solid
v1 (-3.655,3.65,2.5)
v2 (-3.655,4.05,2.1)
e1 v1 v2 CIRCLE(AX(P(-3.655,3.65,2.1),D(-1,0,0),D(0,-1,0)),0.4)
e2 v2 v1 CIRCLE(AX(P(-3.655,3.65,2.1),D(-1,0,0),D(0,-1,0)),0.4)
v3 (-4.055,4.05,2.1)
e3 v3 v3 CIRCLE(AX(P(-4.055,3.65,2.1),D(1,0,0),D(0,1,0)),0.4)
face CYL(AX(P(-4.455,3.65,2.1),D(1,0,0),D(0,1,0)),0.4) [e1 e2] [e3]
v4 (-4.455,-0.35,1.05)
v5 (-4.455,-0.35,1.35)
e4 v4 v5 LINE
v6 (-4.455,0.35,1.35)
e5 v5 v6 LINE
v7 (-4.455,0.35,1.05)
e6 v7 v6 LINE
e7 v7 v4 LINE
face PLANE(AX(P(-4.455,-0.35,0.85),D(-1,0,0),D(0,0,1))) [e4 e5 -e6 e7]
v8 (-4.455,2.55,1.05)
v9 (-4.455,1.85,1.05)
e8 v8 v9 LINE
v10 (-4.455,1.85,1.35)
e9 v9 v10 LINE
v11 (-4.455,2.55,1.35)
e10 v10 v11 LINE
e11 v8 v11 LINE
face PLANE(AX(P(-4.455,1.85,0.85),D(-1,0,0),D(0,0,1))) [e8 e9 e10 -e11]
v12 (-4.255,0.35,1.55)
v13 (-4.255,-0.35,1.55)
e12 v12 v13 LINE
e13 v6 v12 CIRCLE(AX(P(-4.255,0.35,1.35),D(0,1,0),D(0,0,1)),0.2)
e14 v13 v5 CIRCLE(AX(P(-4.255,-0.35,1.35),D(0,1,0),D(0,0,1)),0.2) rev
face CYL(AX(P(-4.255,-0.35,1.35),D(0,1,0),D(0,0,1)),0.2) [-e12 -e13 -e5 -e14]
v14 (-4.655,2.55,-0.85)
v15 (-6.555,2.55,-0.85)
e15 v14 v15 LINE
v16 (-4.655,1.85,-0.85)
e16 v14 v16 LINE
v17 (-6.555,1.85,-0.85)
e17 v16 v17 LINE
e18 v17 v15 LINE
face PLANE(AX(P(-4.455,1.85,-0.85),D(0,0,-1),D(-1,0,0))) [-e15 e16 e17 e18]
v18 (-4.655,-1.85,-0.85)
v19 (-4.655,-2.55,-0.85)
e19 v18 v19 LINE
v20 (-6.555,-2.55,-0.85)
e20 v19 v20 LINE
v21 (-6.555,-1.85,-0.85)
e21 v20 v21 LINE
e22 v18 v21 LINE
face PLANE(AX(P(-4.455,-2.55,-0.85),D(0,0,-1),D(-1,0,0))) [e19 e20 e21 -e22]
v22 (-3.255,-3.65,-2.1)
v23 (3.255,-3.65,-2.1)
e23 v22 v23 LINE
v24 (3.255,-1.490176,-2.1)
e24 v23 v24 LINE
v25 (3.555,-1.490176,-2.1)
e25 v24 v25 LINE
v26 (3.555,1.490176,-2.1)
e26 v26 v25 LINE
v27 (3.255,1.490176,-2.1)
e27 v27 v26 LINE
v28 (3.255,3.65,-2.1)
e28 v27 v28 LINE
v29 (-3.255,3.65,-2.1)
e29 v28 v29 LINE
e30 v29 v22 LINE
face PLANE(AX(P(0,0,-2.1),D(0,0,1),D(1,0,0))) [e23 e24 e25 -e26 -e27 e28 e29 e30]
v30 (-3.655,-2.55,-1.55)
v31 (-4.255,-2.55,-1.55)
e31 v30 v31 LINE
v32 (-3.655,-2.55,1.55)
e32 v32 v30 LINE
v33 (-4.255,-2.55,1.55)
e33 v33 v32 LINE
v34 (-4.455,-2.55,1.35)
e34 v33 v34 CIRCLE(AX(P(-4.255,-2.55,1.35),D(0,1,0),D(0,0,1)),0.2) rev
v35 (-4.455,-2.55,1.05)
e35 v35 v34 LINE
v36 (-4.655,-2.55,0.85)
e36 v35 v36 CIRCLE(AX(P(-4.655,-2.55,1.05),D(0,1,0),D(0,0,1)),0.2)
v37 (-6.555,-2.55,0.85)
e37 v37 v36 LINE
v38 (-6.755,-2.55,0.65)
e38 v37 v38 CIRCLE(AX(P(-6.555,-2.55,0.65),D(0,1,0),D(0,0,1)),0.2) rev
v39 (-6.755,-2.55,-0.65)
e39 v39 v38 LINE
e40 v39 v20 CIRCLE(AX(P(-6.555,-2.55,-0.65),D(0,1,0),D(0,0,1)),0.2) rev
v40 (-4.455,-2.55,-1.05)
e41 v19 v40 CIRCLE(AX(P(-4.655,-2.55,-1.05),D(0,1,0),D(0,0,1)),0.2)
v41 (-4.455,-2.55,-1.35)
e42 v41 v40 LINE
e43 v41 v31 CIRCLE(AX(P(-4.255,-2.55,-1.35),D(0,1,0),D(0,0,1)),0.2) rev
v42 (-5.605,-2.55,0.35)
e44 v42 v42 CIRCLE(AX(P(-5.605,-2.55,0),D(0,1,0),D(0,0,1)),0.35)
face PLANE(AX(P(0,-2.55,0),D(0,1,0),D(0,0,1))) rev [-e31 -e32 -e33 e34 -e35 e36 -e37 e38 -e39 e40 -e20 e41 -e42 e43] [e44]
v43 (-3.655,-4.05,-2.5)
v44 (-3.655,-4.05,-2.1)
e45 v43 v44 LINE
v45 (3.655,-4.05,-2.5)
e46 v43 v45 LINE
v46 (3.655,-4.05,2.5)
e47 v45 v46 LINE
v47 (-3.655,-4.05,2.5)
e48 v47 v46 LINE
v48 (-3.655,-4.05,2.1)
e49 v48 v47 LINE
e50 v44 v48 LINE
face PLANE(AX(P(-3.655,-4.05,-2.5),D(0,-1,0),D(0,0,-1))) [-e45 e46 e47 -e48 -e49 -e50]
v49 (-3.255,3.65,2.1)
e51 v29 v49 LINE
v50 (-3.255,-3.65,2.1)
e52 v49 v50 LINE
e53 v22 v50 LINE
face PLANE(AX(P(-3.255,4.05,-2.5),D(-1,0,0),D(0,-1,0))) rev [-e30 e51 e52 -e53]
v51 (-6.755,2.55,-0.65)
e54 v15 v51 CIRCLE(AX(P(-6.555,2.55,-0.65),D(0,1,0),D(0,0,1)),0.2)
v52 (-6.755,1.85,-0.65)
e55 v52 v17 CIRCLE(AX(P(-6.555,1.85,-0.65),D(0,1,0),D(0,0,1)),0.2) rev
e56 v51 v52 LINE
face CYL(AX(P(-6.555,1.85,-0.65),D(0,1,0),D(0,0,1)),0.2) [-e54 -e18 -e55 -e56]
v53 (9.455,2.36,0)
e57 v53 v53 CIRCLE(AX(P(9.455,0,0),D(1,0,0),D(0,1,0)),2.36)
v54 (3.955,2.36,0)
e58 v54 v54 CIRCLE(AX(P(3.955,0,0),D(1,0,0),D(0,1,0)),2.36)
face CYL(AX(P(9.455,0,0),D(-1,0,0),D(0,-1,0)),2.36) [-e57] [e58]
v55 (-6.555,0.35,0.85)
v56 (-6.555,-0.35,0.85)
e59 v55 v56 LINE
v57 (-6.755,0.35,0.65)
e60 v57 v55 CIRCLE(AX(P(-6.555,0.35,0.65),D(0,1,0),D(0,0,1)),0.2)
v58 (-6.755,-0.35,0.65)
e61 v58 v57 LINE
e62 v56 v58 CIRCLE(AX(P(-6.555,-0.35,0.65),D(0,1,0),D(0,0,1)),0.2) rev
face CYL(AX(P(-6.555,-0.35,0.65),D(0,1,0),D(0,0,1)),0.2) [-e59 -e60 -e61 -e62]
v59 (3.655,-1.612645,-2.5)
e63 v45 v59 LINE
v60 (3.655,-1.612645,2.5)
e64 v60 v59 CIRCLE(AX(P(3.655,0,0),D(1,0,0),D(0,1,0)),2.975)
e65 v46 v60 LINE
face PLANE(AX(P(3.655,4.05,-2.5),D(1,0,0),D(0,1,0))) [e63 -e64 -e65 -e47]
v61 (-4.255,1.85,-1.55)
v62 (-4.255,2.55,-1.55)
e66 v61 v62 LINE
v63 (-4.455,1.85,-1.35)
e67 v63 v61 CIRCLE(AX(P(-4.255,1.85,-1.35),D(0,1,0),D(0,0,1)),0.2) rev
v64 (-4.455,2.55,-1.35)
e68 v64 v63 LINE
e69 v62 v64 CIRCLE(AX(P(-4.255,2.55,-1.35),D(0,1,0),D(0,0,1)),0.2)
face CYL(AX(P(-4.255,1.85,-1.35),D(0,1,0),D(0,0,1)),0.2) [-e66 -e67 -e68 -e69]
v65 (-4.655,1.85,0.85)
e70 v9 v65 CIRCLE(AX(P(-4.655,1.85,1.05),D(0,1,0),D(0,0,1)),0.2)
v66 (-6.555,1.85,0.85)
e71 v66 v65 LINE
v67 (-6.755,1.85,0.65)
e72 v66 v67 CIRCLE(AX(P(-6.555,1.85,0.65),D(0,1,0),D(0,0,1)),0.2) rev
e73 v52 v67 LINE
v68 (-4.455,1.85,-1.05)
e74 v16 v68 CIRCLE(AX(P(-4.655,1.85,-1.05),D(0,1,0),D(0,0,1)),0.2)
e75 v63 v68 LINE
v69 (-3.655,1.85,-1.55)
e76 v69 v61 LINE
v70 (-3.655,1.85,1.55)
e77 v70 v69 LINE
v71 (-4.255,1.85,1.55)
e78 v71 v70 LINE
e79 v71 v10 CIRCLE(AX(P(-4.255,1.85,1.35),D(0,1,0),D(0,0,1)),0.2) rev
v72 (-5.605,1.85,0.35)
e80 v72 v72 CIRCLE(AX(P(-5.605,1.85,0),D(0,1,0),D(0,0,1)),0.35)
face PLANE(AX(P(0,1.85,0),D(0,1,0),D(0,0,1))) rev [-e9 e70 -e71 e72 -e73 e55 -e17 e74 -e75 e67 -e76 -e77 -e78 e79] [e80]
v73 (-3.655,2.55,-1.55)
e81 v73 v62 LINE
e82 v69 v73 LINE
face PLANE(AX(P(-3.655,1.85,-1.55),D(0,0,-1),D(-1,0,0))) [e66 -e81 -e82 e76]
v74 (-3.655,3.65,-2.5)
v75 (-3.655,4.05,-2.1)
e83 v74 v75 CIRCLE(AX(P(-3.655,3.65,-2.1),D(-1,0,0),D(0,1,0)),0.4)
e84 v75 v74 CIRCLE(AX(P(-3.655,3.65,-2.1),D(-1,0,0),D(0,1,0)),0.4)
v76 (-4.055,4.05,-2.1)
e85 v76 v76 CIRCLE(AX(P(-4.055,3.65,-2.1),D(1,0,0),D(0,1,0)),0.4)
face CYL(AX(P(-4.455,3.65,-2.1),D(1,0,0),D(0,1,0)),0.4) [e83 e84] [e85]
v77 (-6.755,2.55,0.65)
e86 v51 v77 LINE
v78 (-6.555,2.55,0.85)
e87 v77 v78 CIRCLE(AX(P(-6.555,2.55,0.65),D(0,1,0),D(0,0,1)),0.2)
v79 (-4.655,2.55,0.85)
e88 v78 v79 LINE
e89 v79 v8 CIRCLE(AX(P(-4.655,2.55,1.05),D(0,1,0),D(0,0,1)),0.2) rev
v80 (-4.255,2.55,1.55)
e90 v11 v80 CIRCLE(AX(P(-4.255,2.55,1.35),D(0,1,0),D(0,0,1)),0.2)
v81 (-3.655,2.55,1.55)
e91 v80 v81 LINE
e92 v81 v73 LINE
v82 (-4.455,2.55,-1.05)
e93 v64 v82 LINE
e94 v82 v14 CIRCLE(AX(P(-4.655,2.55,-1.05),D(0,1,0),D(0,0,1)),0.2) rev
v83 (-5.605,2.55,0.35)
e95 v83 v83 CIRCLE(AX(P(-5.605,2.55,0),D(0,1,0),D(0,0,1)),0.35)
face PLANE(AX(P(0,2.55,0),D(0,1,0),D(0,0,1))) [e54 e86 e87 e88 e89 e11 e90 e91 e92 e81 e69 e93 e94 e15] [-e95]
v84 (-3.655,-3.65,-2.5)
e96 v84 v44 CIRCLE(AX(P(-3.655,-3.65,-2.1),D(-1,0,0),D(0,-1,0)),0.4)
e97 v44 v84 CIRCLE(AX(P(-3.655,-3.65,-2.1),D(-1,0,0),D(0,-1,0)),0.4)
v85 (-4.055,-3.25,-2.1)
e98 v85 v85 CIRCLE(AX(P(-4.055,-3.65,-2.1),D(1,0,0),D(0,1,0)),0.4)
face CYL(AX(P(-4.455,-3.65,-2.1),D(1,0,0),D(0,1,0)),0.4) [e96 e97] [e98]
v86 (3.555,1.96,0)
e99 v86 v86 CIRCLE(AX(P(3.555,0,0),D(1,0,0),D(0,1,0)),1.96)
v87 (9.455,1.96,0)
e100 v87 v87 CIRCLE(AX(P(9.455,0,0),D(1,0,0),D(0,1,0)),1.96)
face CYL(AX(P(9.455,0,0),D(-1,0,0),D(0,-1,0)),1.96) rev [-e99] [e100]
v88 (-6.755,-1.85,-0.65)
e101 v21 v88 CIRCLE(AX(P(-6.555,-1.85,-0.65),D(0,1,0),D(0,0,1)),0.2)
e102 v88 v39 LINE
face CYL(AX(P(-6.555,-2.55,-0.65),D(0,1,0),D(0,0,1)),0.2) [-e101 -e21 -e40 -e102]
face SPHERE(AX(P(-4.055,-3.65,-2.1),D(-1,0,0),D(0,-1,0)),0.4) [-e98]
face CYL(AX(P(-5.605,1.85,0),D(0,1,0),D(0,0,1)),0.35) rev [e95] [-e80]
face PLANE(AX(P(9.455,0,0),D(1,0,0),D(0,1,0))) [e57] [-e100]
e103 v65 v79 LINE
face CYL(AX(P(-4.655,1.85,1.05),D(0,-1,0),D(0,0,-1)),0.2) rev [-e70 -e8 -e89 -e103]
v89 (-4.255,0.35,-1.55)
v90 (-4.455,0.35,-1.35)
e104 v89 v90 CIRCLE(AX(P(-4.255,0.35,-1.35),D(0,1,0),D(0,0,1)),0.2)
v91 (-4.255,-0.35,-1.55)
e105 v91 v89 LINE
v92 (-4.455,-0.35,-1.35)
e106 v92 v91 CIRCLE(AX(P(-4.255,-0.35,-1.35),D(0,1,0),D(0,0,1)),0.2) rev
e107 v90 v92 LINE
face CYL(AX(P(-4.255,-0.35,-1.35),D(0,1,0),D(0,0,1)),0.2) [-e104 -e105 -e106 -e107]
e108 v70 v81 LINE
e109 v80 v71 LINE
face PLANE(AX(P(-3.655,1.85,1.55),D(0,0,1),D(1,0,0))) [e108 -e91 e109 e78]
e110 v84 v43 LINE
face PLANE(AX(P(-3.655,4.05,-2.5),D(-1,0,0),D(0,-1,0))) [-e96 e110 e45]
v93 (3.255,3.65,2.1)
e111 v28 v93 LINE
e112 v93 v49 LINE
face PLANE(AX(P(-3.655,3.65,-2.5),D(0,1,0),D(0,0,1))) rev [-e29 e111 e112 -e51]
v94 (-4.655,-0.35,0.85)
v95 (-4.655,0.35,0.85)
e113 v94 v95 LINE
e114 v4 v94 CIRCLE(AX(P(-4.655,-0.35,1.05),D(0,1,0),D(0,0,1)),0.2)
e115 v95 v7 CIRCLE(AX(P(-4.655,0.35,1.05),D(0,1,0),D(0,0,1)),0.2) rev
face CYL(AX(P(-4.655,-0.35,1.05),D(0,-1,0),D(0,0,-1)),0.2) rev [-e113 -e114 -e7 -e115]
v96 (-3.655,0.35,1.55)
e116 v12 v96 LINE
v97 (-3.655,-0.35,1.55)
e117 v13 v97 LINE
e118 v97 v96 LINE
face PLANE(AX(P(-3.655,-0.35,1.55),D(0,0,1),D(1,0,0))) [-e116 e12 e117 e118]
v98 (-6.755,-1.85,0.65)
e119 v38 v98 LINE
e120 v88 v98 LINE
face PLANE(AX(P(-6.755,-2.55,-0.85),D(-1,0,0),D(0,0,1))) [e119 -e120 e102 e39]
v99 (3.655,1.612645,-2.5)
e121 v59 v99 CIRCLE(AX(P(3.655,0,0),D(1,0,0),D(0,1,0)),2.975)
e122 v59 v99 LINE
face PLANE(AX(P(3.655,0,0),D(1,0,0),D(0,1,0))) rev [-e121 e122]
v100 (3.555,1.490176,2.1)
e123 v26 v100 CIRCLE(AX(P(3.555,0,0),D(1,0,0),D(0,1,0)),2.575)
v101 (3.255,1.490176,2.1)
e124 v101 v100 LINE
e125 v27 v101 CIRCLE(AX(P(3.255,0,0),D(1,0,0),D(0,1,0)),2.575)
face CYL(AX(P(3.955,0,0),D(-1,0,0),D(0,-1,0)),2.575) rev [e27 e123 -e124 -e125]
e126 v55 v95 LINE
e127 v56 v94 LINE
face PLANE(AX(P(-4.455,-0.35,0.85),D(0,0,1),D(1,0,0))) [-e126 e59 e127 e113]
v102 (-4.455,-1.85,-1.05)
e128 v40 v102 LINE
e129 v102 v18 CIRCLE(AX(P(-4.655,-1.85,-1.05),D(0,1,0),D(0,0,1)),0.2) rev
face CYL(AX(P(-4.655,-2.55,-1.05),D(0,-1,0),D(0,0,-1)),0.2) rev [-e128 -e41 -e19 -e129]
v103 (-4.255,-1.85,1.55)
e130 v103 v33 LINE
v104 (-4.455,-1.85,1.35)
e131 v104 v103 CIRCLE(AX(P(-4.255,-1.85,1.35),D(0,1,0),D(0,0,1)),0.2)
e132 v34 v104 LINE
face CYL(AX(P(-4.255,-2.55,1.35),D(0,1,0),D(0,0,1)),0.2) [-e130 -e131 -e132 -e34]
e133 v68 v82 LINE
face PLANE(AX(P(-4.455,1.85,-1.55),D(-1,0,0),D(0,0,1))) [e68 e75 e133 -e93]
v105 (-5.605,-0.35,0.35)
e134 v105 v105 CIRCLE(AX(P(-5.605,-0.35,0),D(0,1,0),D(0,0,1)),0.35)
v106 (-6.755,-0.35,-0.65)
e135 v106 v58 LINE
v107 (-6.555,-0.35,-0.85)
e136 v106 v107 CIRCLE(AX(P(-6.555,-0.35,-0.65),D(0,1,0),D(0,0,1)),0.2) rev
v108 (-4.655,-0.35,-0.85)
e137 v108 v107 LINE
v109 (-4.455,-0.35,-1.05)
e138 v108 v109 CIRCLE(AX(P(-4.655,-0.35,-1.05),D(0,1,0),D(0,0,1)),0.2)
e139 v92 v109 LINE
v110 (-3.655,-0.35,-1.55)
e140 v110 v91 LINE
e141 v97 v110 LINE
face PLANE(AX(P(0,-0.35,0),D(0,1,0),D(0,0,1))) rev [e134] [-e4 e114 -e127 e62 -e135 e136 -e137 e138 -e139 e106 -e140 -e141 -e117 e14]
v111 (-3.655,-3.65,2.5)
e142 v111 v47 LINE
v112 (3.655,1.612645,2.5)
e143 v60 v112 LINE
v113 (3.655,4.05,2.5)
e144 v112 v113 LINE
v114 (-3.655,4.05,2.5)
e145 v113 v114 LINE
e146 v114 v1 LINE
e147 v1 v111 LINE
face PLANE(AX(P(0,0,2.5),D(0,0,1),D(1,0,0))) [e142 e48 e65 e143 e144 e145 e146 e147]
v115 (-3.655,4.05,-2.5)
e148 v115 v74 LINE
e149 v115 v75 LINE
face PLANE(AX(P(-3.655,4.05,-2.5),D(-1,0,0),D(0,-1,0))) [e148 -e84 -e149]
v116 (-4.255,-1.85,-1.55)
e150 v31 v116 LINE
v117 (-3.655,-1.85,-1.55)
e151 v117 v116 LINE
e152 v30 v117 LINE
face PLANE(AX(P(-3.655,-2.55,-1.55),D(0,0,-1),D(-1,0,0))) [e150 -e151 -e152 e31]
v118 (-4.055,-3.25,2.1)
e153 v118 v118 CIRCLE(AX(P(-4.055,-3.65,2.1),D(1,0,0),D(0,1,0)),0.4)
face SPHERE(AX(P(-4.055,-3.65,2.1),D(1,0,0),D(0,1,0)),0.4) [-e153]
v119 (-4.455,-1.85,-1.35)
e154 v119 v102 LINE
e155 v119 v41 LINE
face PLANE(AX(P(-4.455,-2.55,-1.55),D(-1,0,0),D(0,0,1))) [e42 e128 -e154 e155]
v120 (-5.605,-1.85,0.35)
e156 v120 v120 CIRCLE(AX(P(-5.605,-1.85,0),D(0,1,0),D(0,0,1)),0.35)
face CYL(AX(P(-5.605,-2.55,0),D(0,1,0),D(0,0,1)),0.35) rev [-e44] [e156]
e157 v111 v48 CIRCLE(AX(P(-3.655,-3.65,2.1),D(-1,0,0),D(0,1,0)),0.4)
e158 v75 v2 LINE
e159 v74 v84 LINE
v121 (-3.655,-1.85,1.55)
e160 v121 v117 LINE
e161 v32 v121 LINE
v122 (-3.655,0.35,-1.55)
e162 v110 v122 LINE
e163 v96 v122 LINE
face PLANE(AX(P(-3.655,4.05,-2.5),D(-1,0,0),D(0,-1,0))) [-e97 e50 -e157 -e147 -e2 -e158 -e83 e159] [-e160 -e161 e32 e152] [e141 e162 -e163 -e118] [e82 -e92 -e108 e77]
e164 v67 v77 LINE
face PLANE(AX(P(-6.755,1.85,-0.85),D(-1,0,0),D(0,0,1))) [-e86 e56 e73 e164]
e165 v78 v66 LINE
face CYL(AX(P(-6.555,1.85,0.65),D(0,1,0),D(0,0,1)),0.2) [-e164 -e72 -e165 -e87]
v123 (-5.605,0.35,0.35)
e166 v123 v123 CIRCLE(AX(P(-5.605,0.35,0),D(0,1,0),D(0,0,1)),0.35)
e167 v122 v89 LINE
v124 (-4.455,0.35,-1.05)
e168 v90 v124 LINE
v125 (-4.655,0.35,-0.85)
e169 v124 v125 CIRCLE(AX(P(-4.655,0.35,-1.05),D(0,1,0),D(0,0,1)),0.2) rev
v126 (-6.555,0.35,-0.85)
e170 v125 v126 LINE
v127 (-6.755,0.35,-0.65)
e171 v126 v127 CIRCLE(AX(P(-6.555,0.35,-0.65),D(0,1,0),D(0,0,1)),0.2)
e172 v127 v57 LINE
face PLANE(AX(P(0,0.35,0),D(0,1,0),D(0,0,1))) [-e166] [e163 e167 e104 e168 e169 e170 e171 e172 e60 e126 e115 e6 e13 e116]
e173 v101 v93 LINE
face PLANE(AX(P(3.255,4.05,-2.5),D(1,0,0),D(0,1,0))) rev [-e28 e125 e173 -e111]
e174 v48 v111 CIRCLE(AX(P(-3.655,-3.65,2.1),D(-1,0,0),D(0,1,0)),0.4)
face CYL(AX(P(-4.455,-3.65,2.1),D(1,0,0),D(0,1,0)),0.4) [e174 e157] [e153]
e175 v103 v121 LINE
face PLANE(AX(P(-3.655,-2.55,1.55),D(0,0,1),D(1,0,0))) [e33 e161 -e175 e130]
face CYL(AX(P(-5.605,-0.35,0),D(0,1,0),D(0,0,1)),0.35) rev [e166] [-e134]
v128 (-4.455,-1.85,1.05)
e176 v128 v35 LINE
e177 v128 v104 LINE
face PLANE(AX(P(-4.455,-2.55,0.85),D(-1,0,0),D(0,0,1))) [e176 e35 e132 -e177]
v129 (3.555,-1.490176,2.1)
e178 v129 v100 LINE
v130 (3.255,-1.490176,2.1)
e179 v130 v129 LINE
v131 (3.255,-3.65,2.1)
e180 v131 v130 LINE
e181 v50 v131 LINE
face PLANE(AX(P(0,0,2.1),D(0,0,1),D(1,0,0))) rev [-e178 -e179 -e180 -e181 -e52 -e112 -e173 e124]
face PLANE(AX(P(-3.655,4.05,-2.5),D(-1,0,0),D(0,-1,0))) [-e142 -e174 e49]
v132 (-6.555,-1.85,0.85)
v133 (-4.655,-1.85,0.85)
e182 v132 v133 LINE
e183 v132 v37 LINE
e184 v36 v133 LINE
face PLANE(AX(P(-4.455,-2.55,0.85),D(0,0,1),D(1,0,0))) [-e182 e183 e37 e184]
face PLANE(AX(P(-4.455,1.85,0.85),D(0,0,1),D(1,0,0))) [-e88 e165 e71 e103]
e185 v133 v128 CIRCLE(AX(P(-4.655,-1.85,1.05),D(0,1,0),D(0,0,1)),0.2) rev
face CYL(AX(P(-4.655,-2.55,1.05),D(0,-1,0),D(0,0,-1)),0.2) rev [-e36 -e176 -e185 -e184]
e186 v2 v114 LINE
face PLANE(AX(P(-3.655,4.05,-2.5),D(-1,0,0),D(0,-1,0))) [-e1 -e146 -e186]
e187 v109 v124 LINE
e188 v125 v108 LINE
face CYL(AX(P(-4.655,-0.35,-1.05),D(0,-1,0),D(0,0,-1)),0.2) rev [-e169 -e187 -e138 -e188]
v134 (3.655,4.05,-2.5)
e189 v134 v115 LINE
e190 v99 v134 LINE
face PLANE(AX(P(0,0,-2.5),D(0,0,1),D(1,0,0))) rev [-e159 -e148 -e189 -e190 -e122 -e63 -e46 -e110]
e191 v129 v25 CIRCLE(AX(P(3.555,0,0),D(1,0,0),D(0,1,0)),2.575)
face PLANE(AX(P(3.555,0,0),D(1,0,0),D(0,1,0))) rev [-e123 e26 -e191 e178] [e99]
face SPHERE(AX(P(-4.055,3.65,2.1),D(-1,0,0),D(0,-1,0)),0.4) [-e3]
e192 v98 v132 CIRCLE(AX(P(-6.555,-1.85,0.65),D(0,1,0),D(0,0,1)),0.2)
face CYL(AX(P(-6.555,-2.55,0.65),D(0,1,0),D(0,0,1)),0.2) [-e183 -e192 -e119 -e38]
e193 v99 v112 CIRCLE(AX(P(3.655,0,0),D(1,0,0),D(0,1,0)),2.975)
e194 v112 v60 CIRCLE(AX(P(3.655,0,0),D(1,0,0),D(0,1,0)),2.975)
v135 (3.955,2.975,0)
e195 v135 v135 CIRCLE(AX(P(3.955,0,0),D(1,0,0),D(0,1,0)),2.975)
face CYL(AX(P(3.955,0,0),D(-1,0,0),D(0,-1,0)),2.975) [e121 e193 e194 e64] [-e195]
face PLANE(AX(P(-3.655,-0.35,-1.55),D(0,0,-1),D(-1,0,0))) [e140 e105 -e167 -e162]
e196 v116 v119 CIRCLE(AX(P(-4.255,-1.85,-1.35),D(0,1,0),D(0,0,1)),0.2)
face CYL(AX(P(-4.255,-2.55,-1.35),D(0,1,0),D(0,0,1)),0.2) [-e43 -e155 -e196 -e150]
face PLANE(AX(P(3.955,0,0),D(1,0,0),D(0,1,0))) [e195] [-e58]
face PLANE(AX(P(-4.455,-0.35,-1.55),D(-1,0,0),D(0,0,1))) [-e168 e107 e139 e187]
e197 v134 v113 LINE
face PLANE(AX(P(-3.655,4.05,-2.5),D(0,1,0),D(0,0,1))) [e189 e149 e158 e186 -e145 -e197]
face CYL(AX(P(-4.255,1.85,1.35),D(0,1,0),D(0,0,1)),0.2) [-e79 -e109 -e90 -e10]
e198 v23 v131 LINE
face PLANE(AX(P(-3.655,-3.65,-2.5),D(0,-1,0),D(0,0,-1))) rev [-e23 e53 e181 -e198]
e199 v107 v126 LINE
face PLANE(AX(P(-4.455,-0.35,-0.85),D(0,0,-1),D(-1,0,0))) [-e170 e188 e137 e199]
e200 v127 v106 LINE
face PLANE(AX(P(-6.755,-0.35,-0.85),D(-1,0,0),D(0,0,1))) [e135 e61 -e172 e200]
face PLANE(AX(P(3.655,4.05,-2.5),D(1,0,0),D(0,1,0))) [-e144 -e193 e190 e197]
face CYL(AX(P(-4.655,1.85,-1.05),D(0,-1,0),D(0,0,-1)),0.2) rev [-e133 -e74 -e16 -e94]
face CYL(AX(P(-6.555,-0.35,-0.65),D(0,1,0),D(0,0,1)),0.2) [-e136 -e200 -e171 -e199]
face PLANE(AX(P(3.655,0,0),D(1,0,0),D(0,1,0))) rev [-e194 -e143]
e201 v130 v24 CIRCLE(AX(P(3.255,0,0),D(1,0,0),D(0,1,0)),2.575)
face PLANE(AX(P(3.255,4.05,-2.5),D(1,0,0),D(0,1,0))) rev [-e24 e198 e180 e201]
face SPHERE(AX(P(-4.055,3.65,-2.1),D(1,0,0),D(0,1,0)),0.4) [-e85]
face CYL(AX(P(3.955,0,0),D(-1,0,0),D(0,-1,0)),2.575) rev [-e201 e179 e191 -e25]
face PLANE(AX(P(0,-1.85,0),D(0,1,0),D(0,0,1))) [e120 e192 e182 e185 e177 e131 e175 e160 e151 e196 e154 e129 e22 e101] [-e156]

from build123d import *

# Parameters (mm, degrees)
BOSS_EXTRUDE1_DEPTH      = 2.5
BOSS_EXTRUDE1_DEPTH_BACK = 2.5
SKETCH1_W                = 7.31
SKETCH1_H                = 8.1
SKETCH2_R                = 0.4
BOSS_EXTRUDE2_DEPTH      = 0.8
FILLET1_R                = 0.4
SKETCH3_R                = 0.35
BOSS_EXTRUDE3_DEPTH      = 0.35
LPATTERN1_COUNT          = 2
LPATTERN1_PITCH          = 2.2
LPATTERN2_COUNT          = 2
LPATTERN2_PITCH          = 2.2
FILLET2_R                = 0.2
SKETCH4_R                = 2.975
BOSS_EXTRUDE4_DEPTH      = 0.3
SKETCH5_R                = 2.36
BOSS_EXTRUDE5_DEPTH      = 5.5
SHELL1_START             = -3.255
SHELL1_OUTLINE_W         = 7.3
SHELL1_OUTLINE_H         = 4.2
SHELL1_DEPTH             = 6.51
SHELL1_START_2           = 3.255
SHELL1_2_OUTLINE_R       = 1.96
SHELL1_2_DEPTH           = 6.2
SHELL1_3_OUTLINE_R       = 1.96
SHELL1_3_DEPTH           = 0.3


# Read off the part's stored shape, not the designer's step: Shell1
with BuildPart() as part:
    # Sketch1 → Boss-Extrude1 (new, two sides: drawn at the far end of the back side and taken through both)
    with BuildSketch(Plane.XY.offset(-BOSS_EXTRUDE1_DEPTH_BACK)):
        Rectangle(SKETCH1_W, SKETCH1_H)
    extrude(amount=BOSS_EXTRUDE1_DEPTH + BOSS_EXTRUDE1_DEPTH_BACK)

    # Sketch2 → Boss-Extrude2 (add)
    with BuildSketch(Plane.ZY.offset(3.655)):
        with Locations(Location((2.1, 3.65, 0), (0, 0, 90))):
            Circle(SKETCH2_R)
        with Locations(Location((2.1, -3.65, 0), (0, 0, 90))):
            Circle(SKETCH2_R)
        with Locations(Location((-2.1, -3.65, 0), (0, 0, 270))):
            Circle(SKETCH2_R)
        with Locations(Location((-2.1, 3.65, 0), (0, 0, 90))):
            Circle(SKETCH2_R)
    extrude(amount=BOSS_EXTRUDE2_DEPTH)

    # Fillet1
    fillet1_edges = [part.edges().sort_by_distance(p)[0] for p in [
        (-4.455, 3.25, 2.1),
        (-4.455, -4.05, 2.1),
        (-4.455, -3.25, -2.1),
        (-4.455, 3.25, -2.1),
    ]]
    fillet(fillet1_edges, radius=FILLET1_R)

    # Sketch3 → Boss-Extrude3 (add, symmetric)
    with BuildSketch(Plane(origin=(0, 0, 0), x_dir=(1, 0, 0), z_dir=(0, 1, 0))):
        Polygon((-3.655, 1.55), (-4.455, 1.55), (-4.455, 0.85), (-6.755, 0.85), (-6.755, -0.85), (-4.455, -0.85), (-4.455, -1.55), (-3.655, -1.55), align=None)
        with Locations(Location((-5.605, 0, 0), (0, 0, 270))):
            Circle(SKETCH3_R, mode=Mode.SUBTRACT)
    boss_extrude3 = extrude(amount=BOSS_EXTRUDE3_DEPTH, both=True)

    # LPattern1: Boss-Extrude3 ×2
    with Locations(*[(0, -i * LPATTERN1_PITCH, 0) for i in range(1, LPATTERN1_COUNT)]):
        add(boss_extrude3)

    # LPattern2: Boss-Extrude3 ×2
    with Locations(*[(0, i * LPATTERN2_PITCH, 0) for i in range(1, LPATTERN2_COUNT)]):
        add(boss_extrude3)

    # Fillet2
    fillet2_edges = [part.edges().sort_by_distance(p)[0] for p in [
        (-6.755, 2.2, -0.85),
        (-4.455, 2.2, -0.85),
        (-4.455, 2.2, -1.55),
        (-4.455, 2.2, 1.55),
        (-4.455, 2.2, 0.85),
        (-6.755, 2.2, 0.85),
        (-6.755, 0, -0.85),
        (-4.455, 0, -0.85),
        (-4.455, 0, -1.55),
        (-4.455, 0, 1.55),
        (-4.455, 0, 0.85),
        (-6.755, 0, 0.85),
        (-6.755, -2.2, -0.85),
        (-4.455, -2.2, -0.85),
        (-4.455, -2.2, -1.55),
        (-4.455, -2.2, 1.55),
        (-4.455, -2.2, 0.85),
        (-6.755, -2.2, 0.85),
    ]]
    fillet(fillet2_edges, radius=FILLET2_R)

    # Sketch4 → Boss-Extrude4 (add)
    with BuildSketch(Plane(origin=(3.655, 0, 0), x_dir=(0, 0, -1), z_dir=(1, 0, 0))):
        with Locations(Location((0, 0, 0), (0, 0, 212.824368373))):
            Circle(SKETCH4_R)
    extrude(amount=BOSS_EXTRUDE4_DEPTH)

    # Sketch5 → Boss-Extrude5 (add)
    with BuildSketch(Plane(origin=(3.955, 0, 0), x_dir=(0, 0, -1), z_dir=(1, 0, 0))):
        with Locations(Location((0, 0, 0), (0, 0, 90))):
            Circle(SKETCH5_R)
    extrude(amount=BOSS_EXTRUDE5_DEPTH)

    # Shell1 outline → Shell1 (cut)
    with BuildSketch(Plane.YZ.offset(SHELL1_START)):
        Rectangle(SHELL1_OUTLINE_W, SHELL1_OUTLINE_H)
    extrude(amount=SHELL1_DEPTH, mode=Mode.SUBTRACT)

    # Shell1 2 outline → Shell1 2 (cut)
    with BuildSketch(Plane.YZ.offset(SHELL1_START_2)):
        Circle(SHELL1_2_OUTLINE_R)
    extrude(amount=SHELL1_2_DEPTH, mode=Mode.SUBTRACT)

    # Shell1 3 outline → Shell1 3 (cut)
    with BuildSketch(Plane.YZ.offset(SHELL1_START_2)):
        with BuildLine():
            ThreePointArc((-1.490176164, 2.1), (-2.575, 0), (-1.490176164, -2.1))
            Line((-1.490176164, -2.1), (1.490176164, -2.1))
            ThreePointArc((1.490176164, -2.1), (2.575, 0), (1.490176164, 2.1))
            Line((1.490176164, 2.1), (-1.490176164, 2.1))
        make_face()
        Circle(SHELL1_3_OUTLINE_R, mode=Mode.SUBTRACT)
    extrude(amount=SHELL1_3_DEPTH, mode=Mode.SUBTRACT)


solid = part.part
